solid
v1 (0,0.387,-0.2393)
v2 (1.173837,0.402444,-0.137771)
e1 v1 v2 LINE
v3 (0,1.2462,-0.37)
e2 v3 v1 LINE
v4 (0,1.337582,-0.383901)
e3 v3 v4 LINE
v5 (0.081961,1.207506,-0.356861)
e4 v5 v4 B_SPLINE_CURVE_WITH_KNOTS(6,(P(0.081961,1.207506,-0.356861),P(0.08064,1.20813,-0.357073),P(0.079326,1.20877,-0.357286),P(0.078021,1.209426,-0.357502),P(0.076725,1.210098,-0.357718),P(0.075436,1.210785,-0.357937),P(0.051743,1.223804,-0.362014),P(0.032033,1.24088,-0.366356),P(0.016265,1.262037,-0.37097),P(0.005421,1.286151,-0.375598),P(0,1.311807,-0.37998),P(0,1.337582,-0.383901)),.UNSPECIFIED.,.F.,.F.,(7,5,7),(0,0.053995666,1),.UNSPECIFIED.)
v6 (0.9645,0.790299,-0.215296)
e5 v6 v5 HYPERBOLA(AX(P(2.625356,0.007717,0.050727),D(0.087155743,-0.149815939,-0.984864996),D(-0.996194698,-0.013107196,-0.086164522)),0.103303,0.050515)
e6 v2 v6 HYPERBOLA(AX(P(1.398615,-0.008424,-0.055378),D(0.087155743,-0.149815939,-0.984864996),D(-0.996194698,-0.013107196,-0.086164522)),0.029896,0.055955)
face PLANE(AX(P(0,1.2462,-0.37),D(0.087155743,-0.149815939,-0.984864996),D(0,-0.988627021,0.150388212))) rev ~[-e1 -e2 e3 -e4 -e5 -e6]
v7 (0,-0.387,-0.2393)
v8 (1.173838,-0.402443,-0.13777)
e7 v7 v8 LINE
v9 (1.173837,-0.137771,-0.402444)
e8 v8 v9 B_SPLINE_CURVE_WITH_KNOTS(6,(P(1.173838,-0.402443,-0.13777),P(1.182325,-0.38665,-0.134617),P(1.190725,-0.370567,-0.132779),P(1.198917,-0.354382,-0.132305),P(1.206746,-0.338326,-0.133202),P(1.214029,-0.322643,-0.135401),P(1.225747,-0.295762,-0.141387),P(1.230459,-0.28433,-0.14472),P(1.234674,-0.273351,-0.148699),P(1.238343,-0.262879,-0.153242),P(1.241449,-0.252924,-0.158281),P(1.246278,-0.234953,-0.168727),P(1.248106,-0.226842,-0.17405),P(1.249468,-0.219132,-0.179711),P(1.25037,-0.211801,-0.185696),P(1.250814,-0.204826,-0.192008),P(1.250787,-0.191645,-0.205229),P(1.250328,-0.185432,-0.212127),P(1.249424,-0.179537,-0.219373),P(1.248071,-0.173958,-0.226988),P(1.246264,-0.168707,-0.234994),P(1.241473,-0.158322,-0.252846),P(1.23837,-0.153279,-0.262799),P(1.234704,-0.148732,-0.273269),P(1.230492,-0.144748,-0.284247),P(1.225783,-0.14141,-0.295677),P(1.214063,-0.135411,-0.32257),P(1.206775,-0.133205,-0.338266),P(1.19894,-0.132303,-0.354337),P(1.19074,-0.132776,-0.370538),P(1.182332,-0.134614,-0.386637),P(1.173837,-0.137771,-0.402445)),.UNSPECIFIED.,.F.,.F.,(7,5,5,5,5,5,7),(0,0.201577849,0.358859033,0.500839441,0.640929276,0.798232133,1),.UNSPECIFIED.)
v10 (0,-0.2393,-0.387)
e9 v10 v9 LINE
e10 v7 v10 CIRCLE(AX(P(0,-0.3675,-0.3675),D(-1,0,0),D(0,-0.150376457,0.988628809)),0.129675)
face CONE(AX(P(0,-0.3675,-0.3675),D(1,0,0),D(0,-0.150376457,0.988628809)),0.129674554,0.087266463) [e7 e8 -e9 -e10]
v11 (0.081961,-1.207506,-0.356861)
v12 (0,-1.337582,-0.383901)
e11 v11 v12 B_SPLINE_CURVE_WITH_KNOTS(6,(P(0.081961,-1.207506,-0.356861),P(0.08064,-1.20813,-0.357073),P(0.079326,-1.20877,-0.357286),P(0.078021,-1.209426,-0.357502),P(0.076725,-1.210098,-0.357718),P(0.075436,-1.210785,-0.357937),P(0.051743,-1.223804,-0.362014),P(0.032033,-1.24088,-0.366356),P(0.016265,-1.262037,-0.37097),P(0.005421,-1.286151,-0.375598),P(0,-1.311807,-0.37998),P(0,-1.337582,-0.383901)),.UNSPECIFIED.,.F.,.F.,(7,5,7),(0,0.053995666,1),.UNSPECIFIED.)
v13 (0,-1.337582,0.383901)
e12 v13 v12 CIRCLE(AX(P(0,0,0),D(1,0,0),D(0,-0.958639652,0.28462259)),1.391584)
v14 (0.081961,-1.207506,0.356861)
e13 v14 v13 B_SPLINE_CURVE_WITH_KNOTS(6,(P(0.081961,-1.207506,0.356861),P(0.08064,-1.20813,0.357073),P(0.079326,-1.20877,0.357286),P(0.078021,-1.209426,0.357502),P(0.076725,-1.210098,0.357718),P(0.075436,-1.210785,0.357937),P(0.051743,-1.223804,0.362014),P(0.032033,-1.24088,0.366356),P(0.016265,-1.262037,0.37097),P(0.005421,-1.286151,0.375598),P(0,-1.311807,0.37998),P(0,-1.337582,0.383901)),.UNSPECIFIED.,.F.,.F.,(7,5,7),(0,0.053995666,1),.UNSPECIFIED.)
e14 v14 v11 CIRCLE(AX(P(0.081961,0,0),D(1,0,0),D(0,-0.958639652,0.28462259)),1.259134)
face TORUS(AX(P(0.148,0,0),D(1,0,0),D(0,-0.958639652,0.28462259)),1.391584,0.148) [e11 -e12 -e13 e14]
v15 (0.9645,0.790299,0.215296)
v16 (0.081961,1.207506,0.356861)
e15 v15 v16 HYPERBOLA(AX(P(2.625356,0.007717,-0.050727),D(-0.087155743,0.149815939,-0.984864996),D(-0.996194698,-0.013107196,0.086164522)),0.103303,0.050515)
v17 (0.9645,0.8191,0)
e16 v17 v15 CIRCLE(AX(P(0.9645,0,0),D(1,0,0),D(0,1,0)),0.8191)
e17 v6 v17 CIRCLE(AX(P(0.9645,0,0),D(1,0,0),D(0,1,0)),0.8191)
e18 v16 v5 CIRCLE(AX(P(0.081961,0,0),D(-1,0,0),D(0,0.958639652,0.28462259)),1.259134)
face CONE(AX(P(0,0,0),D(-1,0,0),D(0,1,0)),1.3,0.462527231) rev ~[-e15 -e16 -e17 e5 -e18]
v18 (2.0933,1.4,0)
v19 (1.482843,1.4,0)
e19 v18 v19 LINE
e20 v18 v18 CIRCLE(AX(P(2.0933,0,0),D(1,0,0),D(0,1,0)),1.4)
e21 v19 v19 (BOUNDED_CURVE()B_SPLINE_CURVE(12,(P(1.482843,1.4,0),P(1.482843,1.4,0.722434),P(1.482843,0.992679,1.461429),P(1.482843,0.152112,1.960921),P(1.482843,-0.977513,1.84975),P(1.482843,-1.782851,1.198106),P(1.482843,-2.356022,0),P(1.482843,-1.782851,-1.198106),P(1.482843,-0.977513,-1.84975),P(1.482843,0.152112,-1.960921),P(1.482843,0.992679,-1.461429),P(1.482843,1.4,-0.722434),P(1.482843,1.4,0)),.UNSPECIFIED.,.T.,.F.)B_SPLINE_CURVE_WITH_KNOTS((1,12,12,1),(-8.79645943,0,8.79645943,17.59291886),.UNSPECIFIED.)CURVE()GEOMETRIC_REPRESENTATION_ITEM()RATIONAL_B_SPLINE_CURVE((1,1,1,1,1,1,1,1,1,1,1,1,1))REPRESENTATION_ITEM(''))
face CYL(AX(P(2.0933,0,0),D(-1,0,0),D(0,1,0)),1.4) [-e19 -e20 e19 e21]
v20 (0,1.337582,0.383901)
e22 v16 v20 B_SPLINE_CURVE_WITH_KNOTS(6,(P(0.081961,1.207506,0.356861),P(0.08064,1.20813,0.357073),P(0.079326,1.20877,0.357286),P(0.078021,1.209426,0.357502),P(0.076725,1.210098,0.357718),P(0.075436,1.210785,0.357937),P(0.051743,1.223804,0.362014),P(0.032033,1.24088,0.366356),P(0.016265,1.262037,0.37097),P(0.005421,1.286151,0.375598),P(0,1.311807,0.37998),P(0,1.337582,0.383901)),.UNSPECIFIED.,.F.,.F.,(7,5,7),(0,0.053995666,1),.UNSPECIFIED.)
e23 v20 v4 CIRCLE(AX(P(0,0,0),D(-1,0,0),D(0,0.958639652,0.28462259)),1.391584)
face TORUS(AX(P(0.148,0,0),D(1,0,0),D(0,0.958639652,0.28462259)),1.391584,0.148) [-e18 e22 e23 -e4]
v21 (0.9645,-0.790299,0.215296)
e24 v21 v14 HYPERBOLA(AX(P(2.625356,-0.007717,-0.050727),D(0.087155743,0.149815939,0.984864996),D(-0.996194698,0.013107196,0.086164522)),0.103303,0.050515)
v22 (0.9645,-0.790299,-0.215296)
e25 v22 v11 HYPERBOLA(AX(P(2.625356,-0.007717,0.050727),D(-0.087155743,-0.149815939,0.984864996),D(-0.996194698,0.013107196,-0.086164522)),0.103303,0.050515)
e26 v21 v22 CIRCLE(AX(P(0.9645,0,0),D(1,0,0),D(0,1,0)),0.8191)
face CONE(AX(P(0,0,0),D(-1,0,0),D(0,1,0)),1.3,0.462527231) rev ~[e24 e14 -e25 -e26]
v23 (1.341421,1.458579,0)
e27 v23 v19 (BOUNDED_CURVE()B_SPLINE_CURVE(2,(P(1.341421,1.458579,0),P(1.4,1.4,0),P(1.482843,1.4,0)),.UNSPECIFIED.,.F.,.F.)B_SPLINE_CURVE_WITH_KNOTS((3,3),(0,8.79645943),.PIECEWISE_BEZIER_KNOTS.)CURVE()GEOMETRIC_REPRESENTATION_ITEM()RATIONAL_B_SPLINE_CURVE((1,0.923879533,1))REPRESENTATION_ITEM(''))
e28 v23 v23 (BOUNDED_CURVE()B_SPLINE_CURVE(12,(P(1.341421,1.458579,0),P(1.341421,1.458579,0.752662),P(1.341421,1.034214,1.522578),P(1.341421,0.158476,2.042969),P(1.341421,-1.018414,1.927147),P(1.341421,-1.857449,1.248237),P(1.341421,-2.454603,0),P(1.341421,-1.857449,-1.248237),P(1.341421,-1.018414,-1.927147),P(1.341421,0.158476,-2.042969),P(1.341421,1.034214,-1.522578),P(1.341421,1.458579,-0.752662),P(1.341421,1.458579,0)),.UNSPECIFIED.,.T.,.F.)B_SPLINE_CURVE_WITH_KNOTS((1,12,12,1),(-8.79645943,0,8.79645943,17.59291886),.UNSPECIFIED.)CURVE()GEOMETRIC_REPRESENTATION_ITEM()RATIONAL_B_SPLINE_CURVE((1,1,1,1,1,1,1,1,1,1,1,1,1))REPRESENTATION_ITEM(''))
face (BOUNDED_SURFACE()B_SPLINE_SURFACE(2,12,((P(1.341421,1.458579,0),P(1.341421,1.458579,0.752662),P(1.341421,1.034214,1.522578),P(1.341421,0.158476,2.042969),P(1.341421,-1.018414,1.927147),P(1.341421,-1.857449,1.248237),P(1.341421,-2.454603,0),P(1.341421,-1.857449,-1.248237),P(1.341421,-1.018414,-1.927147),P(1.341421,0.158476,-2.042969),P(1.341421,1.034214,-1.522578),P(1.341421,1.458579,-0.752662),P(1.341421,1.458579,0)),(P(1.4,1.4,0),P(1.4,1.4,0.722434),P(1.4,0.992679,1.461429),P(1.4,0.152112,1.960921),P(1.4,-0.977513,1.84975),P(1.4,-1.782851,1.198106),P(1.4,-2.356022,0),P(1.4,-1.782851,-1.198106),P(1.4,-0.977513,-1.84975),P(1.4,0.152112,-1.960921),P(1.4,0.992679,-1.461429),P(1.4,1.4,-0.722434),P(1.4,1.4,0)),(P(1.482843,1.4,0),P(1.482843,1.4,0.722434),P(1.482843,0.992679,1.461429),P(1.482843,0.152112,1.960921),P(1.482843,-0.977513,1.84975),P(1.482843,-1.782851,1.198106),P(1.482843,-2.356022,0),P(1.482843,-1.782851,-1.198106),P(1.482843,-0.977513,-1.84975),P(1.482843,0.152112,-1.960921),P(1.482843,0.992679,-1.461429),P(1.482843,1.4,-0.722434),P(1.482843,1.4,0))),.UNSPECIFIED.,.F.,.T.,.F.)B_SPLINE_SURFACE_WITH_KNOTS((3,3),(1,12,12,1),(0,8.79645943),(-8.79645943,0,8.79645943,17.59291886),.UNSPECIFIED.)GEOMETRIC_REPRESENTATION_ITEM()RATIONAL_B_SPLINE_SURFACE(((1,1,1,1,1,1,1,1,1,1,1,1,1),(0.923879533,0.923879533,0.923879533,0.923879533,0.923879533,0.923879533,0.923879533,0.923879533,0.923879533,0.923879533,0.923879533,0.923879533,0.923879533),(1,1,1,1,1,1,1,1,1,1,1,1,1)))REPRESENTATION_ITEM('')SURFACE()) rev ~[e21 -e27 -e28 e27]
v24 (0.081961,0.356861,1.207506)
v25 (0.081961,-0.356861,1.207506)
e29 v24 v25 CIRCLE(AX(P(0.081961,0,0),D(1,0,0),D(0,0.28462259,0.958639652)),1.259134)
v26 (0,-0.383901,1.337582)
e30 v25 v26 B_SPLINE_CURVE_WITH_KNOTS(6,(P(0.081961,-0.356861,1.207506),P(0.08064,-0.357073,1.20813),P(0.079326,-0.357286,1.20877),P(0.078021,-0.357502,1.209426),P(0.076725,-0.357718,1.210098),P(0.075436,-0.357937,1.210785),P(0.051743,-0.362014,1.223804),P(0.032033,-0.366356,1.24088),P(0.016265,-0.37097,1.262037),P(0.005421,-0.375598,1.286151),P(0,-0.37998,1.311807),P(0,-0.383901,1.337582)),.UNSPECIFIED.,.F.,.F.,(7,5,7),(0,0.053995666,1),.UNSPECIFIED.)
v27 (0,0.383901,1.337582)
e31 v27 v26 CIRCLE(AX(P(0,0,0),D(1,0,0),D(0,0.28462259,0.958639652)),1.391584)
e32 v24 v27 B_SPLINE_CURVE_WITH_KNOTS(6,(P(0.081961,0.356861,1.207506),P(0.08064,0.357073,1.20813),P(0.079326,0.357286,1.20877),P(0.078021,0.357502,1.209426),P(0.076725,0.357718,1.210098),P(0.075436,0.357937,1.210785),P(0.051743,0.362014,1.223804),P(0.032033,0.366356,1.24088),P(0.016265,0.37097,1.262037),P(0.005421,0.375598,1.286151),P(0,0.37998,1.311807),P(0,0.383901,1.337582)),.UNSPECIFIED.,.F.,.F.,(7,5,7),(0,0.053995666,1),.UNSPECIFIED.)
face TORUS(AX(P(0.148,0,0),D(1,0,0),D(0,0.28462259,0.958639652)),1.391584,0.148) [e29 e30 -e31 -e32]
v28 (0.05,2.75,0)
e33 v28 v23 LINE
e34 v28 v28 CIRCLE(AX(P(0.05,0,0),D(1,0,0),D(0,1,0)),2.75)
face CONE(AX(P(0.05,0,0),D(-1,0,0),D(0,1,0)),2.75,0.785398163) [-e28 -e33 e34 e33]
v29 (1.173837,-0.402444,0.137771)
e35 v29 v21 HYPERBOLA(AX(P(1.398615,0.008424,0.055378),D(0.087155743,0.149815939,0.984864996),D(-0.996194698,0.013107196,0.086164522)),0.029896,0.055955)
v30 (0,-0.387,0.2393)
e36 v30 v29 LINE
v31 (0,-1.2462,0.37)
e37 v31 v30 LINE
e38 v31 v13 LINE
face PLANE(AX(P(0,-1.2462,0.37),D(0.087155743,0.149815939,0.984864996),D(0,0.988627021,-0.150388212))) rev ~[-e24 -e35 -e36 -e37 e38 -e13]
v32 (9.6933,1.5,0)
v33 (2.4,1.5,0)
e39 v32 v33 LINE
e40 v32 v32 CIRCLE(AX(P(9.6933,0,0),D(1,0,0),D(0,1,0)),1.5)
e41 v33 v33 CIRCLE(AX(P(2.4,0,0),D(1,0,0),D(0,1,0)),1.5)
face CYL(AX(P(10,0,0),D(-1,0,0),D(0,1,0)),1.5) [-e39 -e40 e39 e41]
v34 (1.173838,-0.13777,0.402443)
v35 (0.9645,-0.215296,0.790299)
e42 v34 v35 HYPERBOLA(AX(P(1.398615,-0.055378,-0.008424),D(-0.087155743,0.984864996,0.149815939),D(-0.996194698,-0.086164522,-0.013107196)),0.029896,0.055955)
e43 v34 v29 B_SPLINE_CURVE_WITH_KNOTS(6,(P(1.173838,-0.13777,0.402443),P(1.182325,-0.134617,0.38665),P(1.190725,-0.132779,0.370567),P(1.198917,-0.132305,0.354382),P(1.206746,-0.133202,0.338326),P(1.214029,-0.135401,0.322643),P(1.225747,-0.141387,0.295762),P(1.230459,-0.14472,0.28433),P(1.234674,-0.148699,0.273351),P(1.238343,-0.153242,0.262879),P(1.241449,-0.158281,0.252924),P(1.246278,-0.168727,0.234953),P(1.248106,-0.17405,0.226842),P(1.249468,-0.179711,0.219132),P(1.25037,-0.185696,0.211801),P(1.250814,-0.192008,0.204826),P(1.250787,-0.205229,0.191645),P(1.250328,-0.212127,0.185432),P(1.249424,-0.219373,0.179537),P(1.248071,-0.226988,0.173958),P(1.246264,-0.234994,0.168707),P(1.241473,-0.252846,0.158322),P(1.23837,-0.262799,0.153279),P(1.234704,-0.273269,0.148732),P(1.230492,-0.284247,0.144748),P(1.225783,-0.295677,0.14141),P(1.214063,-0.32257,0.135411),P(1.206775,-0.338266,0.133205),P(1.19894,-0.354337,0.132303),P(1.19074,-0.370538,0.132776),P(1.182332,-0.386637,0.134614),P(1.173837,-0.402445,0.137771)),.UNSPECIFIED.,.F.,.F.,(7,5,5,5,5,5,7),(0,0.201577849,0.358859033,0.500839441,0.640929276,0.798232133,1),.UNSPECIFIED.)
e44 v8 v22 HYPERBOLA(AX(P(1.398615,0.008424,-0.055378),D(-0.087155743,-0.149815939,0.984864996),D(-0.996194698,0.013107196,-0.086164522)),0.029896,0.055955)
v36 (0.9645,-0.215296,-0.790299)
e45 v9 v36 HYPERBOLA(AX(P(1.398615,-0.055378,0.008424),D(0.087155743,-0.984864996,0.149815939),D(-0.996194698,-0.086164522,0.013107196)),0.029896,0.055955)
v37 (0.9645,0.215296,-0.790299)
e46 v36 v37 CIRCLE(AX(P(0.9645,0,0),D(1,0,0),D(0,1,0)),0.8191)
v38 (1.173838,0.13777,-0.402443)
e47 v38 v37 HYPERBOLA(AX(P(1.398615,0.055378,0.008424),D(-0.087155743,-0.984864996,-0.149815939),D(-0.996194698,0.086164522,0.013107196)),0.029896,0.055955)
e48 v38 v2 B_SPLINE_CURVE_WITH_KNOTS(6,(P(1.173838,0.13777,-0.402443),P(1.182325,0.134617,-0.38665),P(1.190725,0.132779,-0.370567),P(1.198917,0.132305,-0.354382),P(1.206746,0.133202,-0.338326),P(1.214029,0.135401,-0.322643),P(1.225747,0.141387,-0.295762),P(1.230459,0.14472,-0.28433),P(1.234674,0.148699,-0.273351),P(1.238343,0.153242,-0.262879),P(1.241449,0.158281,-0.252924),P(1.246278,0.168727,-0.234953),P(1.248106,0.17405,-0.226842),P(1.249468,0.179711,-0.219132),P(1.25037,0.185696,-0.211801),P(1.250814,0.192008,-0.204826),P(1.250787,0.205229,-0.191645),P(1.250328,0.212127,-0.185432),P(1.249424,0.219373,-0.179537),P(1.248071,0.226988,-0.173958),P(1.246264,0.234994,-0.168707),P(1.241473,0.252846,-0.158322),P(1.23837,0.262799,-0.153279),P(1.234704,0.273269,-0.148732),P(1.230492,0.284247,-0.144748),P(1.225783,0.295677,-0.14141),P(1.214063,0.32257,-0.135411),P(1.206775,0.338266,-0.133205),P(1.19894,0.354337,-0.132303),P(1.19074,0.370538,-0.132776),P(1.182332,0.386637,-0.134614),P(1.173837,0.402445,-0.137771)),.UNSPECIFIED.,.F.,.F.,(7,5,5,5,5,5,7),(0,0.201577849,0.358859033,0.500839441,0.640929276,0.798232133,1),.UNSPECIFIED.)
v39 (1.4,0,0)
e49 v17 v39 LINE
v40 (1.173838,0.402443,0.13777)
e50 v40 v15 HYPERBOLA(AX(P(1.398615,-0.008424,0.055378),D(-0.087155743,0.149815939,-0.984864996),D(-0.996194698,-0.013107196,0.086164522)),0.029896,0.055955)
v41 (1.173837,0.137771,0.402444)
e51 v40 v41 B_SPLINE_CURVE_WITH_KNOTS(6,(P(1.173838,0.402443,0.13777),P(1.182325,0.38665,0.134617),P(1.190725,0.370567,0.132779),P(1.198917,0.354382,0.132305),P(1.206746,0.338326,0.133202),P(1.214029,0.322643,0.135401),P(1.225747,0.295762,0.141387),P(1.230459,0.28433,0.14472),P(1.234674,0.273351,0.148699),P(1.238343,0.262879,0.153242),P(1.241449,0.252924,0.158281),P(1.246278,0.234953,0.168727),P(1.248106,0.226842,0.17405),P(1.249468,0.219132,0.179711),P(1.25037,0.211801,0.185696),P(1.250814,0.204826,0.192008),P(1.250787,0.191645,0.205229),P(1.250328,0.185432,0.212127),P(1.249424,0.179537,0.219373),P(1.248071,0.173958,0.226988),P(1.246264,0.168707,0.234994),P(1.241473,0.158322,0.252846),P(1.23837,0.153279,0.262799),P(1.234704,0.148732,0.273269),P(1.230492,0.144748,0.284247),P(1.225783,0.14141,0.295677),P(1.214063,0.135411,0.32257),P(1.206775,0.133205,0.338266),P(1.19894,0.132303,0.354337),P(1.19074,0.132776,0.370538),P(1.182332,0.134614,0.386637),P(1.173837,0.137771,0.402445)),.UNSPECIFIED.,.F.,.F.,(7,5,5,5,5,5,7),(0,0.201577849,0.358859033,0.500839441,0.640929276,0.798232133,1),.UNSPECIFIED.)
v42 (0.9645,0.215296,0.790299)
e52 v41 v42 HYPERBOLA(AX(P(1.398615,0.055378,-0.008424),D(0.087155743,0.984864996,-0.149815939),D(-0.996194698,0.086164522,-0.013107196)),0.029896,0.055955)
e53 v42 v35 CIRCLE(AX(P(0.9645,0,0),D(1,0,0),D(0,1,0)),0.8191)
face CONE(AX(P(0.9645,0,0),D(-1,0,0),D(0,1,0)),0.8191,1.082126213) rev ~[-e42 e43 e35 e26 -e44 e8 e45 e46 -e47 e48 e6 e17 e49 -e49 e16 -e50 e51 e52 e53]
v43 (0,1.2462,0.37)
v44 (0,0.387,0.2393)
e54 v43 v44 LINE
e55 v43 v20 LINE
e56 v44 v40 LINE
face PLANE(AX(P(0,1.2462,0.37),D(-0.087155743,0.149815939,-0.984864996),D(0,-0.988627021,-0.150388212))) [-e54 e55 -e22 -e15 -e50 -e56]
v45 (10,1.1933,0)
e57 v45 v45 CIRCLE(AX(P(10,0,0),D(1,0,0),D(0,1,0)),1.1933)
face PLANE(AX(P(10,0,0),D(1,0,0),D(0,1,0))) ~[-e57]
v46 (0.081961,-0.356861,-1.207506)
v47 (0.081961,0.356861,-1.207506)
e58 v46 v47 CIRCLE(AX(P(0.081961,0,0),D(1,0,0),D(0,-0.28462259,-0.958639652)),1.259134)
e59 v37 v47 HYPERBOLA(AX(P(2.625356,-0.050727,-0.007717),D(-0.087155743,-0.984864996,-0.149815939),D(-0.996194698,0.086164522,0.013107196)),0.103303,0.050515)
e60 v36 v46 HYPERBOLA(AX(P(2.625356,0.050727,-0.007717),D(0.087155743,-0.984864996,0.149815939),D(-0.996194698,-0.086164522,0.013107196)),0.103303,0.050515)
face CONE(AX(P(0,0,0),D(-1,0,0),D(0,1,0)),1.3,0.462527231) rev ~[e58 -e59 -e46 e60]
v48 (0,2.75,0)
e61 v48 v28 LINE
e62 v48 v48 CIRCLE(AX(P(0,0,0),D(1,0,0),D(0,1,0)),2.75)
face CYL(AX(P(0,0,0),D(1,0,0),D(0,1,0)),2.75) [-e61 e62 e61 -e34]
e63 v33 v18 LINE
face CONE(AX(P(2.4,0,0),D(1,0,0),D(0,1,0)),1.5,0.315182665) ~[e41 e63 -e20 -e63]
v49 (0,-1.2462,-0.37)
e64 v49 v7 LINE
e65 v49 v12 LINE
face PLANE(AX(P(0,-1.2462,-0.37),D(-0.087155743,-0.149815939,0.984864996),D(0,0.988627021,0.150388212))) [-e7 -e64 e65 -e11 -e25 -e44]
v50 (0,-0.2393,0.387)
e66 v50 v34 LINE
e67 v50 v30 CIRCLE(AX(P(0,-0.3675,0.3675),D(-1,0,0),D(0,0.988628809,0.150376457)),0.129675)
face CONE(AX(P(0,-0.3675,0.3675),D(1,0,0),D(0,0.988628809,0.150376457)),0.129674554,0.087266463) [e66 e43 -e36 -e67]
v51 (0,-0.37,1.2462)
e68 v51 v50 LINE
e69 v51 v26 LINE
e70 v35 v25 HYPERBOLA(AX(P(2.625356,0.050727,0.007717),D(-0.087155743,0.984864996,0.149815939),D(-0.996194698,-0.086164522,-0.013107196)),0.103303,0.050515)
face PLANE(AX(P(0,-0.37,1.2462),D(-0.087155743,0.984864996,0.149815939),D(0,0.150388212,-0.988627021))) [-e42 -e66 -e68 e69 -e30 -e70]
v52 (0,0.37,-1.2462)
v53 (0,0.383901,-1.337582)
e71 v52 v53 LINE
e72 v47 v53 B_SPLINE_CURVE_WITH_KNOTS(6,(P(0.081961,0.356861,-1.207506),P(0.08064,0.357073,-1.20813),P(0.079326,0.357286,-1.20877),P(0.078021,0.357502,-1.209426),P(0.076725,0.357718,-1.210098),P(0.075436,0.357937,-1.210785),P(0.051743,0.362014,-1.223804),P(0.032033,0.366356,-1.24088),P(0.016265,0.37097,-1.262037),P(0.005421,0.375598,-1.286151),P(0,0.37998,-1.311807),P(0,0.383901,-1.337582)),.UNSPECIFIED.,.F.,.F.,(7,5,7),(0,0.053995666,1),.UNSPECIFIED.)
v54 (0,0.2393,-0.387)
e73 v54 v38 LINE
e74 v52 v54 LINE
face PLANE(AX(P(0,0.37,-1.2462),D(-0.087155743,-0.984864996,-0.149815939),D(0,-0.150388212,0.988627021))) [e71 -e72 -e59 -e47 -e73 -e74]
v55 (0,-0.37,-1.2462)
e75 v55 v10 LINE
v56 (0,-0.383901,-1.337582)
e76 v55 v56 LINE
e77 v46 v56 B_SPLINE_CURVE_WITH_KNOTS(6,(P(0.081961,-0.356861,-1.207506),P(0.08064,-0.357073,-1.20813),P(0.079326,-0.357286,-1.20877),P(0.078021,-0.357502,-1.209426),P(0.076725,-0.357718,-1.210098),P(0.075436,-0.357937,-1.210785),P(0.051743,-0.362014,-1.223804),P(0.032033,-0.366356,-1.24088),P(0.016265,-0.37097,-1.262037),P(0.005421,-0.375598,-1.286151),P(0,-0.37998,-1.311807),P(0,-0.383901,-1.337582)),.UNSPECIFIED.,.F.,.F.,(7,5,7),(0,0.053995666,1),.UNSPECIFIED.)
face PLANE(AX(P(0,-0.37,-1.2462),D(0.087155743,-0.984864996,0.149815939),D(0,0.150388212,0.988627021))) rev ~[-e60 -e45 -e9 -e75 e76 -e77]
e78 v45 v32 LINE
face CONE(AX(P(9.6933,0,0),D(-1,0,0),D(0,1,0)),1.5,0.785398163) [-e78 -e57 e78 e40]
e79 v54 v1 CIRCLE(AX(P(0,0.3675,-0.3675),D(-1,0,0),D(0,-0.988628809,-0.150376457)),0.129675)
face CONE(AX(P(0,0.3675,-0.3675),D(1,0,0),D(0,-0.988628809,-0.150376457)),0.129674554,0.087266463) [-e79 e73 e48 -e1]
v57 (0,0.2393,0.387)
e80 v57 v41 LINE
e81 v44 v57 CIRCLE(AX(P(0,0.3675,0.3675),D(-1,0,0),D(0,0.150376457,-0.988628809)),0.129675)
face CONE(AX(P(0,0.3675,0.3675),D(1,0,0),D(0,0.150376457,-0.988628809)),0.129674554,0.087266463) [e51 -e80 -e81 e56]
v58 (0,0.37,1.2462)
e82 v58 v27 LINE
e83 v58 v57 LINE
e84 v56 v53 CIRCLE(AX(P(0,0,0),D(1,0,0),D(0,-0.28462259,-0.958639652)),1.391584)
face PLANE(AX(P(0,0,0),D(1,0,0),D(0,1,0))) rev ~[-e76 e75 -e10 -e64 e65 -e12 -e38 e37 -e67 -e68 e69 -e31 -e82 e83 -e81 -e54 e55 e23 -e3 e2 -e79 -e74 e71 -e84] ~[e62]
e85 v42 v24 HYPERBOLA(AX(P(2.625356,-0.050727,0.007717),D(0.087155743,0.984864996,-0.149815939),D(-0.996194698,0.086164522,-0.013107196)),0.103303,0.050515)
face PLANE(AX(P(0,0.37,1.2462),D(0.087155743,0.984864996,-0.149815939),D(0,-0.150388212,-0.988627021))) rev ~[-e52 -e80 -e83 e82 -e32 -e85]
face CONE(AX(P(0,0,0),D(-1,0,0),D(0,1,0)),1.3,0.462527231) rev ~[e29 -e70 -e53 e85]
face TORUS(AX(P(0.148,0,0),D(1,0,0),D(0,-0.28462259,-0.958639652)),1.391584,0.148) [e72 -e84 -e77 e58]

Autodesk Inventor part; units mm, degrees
ref_plane "YZ Plane" through (0, 0, 0) normal (1, 0, 0) x (0, 1, 0)
ref_plane "XZ Plane" through (0, 0, 0) normal (0, 1, 0) x (-1, 0, 0)
sketch "Sketch1" plane through (0, 0, 0) normal (0, 0, 1) x (1, 0, 0)
  line L0 (1.4, 0) -> (10, 0)
  line L1 (10, 0) -> (10, 1.5)
  line L2 (10, 1.5) -> (2.4, 1.5)
  line L3 (2.4, 1.5) -> (2.0933, 1.4)
  line L4 (2.0933, 1.4) -> (1.4, 1.4)
  line L5 (0, 2.75) -> (0, 1.3)
  line L6 (0, 1.3) -> (0.9645, 0.8191)
  line L7 (0.9645, 0.8191) -> (1.4, 0)
  line L8 (-2, 0) -> (12, 0) projected
  line L9 (0, -0.55) -> (0, 3.3) projected
  line L10 (0, 2.75) -> (0.05, 2.75)
  line L11 (0.05, 2.75) -> (1.4, 1.4)
  line L12 (2.4, 1.5) -> (1.3, 1.5) construction
  dimension "d1" = 7.6
  dimension "d2" = 3
  dimension "d3" = 2.8
  dimension "d4" = 2.6
  dimension "d5" = 26.5
  dimension "d6" = 62
  dimension "d7" = 1.4
  dimension "d8" = 0.3067
  dimension "d12" = 5.5
  dimension "d13" = 45
  dimension "d15" = 10
  dimension "d24" = 1.4
revolve "Body" add sketch "Sketch1" angle 360 about axis through (1.4, 0, 0) along (1, 0, 0) contours L7 L6 L5 L10 L11 L4 L3 L2 L1 L0
sketch "Sketch2" plane through (0, 0, 0) normal (-1, 0, 0) x (0, 0, 1)
  line L0 (0, 1.3) -> (0, 0) construction
  line L1 (0, 0) -> (1.3, 0) construction
  arc A0 (0.39, 0) -> (0, 0.39) centre (0, 0) ccw construction
  arc A1 (0.455, 0) -> (0, 0.455) centre (0, 0) ccw construction
  arc A2 (1.2462, 0.37) -> (0.37, 1.2462) centre (0, 0) ccw
  line L2 (0, 0) -> (0.9192, 0.9192) construction
  line L3 (0.37, 1.2462) -> (0.2393, 0.387)
  line L4 (1.2462, 0.37) -> (0.387, 0.2393)
  arc A3 (0.37, 1.2462) -> (0, 1.3) centre (0, 0) ccw
  arc A4 (1.3, 0) -> (1.2462, 0.37) centre (0, 0) ccw
  line L5 (0, -3.85) -> (0, 3.85) projected
  line L6 (-3.85, 0) -> (3.85, 0) projected
  arc A5 (0.37, -1.2462) -> (1.2462, -0.37) centre (0, 0) ccw
  line L7 (0.37, -1.2462) -> (0.2393, -0.387)
  line L8 (1.2462, -0.37) -> (0.387, -0.2393)
  arc A6 (0, -1.3) -> (0.37, -1.2462) centre (0, 0) ccw
  arc A7 (1.2462, -0.37) -> (1.3, 0) centre (0, 0) ccw
  arc A8 (-0.37, 1.2462) -> (-1.2462, 0.37) centre (0, 0) ccw
  line L9 (-0.37, 1.2462) -> (-0.2393, 0.387)
  line L10 (-1.2462, 0.37) -> (-0.387, 0.2393)
  arc A9 (0, 1.3) -> (-0.37, 1.2462) centre (0, 0) ccw
  arc A10 (-1.2462, 0.37) -> (-1.3, 0) centre (0, 0) ccw
  arc A11 (-0.37, -1.2462) -> (0, -1.3) centre (0, 0) ccw
  arc A12 (-1.2462, -0.37) -> (-0.37, -1.2462) centre (0, 0) ccw
  arc A13 (-1.3, 0) -> (-1.2462, -0.37) centre (0, 0) ccw
  line L11 (-1.2462, -0.37) -> (-0.387, -0.2393)
  line L12 (-0.37, -1.2462) -> (-0.2393, -0.387)
  arc A14 (0.2393, 0.387) -> (0.387, 0.2393) centre (0.3675, 0.3675) ccw
  arc A15 (0.387, -0.2393) -> (0.2393, -0.387) centre (0.3675, -0.3675) ccw
  arc A16 (-0.387, 0.2393) -> (-0.2393, 0.387) centre (-0.3675, 0.3675) ccw
  arc A17 (-0.2393, -0.387) -> (-0.387, -0.2393) centre (-0.3675, -0.3675) ccw
  point P0 (0.9192, -0.9192)
  point P1 (-0.9192, 0.9192)
  point P2 (-0.9192, -0.9192)
  dimension "d17" = 0.78
  dimension "d18" = 0.91
  dimension "d19" = 2.6
  dimension "d20" = 45
  dimension "d21" = 0.37
extrude "Slot" add sketch "Sketch2" against normal up to surface draft 5 contours L4 A14 L3 A2 | A5 L7 A15 L8 | L9 A16 L10 A8 | A12 L11 A17 L12
fillet "Fillet1" radius 0.148 4 edges at (0, 1.3, 0) (0, 0, -1.3) (0, -1.3, 0) (0, 0, 1.3)
thread "Thread" size "M3x0.5" designation "M3" class "6g" standard "GB Metric profile" length 7.6
ref_plane "Work Plane2" through (3.35, 0, 0) normal (0, 0, -1) x (1, 0, 0)
fillet "Fillet2" radius 0.2 1 edges at (1.4, -1.4, 0)
chamfer "Chamfer1" distance 0.3067 distance2 0.3067 1 edges at (10, -1.5, 0) measured on face at (10, -0.5112, 0.3316)
equation "\"d1\" = GEL"
equation "\"d2\" = GD"
equation "\"d3\" = BDM"
equation "\"d4\" = SDM"
equation "\"d7\" = INTI"
equation "\"d8\" = GAL"
equation "\"d12\" = KOD"
equation "\"d13\" = 0.5 * SEWI"
equation "\"d15\" = NLG"
equation "\"d24\" = KOH"
equation "\"d17\" = 0.3 * SDM"
equation "\"d18\" = 0.35 * SDM"
equation "\"d19\" = SDM"
equation "\"d21\" = 0.5 * SBR"
equation "\"d23\" = 0.2 * SBR"
equation "\"d10\" = GEL"
equation "\"d93\" = r"
equation "\"d94\" = -0.5 * SPD + 0.5 * GD"
equation "\"NLG\" = 10"
equation "\"GEL\" = -KOH + NLG - INA"
equation "\"GAL\" = 0.61345 * PTC"
equation "\"SPD\" = NND - 1.2269 * PTC"
equation "\"KOD\" = 5.5"
equation "\"KOH\" = 1.4"
equation "\"SBR\" = 0.74"
equation "\"INTI\" = 1.4"
equation "\"SDM\" = 2.6"
equation "\"GD\" = NND"
equation "\"BDM\" = 2.8"
equation "\"SEWI\" = 90deg"
equation "\"d9\" = SDM"
equation "\"GUL\" = 0.61345 * PTC"
equation "\"TOA\" = 30deg"
equation "\"PTC\" = 0.5"
equation "\"EPV\" = 1.8"
equation "\"THREADDIA\" = 3"
equation "\"FAWI\" = 90deg"
equation "\"RR\" = 0.4"
equation "\"KOHMIN\" = 1.26"
equation "\"NND\" = 3"
equation "\"GD1\" = THREADDIA - 1.2269 * PTC"
equation "\"INA\" = 1"
equation "\"r\" = 0.2"
properties part number "Screw GB/T 13806.1-1992 B M3 x 10" material "Steel, Mild-1"
